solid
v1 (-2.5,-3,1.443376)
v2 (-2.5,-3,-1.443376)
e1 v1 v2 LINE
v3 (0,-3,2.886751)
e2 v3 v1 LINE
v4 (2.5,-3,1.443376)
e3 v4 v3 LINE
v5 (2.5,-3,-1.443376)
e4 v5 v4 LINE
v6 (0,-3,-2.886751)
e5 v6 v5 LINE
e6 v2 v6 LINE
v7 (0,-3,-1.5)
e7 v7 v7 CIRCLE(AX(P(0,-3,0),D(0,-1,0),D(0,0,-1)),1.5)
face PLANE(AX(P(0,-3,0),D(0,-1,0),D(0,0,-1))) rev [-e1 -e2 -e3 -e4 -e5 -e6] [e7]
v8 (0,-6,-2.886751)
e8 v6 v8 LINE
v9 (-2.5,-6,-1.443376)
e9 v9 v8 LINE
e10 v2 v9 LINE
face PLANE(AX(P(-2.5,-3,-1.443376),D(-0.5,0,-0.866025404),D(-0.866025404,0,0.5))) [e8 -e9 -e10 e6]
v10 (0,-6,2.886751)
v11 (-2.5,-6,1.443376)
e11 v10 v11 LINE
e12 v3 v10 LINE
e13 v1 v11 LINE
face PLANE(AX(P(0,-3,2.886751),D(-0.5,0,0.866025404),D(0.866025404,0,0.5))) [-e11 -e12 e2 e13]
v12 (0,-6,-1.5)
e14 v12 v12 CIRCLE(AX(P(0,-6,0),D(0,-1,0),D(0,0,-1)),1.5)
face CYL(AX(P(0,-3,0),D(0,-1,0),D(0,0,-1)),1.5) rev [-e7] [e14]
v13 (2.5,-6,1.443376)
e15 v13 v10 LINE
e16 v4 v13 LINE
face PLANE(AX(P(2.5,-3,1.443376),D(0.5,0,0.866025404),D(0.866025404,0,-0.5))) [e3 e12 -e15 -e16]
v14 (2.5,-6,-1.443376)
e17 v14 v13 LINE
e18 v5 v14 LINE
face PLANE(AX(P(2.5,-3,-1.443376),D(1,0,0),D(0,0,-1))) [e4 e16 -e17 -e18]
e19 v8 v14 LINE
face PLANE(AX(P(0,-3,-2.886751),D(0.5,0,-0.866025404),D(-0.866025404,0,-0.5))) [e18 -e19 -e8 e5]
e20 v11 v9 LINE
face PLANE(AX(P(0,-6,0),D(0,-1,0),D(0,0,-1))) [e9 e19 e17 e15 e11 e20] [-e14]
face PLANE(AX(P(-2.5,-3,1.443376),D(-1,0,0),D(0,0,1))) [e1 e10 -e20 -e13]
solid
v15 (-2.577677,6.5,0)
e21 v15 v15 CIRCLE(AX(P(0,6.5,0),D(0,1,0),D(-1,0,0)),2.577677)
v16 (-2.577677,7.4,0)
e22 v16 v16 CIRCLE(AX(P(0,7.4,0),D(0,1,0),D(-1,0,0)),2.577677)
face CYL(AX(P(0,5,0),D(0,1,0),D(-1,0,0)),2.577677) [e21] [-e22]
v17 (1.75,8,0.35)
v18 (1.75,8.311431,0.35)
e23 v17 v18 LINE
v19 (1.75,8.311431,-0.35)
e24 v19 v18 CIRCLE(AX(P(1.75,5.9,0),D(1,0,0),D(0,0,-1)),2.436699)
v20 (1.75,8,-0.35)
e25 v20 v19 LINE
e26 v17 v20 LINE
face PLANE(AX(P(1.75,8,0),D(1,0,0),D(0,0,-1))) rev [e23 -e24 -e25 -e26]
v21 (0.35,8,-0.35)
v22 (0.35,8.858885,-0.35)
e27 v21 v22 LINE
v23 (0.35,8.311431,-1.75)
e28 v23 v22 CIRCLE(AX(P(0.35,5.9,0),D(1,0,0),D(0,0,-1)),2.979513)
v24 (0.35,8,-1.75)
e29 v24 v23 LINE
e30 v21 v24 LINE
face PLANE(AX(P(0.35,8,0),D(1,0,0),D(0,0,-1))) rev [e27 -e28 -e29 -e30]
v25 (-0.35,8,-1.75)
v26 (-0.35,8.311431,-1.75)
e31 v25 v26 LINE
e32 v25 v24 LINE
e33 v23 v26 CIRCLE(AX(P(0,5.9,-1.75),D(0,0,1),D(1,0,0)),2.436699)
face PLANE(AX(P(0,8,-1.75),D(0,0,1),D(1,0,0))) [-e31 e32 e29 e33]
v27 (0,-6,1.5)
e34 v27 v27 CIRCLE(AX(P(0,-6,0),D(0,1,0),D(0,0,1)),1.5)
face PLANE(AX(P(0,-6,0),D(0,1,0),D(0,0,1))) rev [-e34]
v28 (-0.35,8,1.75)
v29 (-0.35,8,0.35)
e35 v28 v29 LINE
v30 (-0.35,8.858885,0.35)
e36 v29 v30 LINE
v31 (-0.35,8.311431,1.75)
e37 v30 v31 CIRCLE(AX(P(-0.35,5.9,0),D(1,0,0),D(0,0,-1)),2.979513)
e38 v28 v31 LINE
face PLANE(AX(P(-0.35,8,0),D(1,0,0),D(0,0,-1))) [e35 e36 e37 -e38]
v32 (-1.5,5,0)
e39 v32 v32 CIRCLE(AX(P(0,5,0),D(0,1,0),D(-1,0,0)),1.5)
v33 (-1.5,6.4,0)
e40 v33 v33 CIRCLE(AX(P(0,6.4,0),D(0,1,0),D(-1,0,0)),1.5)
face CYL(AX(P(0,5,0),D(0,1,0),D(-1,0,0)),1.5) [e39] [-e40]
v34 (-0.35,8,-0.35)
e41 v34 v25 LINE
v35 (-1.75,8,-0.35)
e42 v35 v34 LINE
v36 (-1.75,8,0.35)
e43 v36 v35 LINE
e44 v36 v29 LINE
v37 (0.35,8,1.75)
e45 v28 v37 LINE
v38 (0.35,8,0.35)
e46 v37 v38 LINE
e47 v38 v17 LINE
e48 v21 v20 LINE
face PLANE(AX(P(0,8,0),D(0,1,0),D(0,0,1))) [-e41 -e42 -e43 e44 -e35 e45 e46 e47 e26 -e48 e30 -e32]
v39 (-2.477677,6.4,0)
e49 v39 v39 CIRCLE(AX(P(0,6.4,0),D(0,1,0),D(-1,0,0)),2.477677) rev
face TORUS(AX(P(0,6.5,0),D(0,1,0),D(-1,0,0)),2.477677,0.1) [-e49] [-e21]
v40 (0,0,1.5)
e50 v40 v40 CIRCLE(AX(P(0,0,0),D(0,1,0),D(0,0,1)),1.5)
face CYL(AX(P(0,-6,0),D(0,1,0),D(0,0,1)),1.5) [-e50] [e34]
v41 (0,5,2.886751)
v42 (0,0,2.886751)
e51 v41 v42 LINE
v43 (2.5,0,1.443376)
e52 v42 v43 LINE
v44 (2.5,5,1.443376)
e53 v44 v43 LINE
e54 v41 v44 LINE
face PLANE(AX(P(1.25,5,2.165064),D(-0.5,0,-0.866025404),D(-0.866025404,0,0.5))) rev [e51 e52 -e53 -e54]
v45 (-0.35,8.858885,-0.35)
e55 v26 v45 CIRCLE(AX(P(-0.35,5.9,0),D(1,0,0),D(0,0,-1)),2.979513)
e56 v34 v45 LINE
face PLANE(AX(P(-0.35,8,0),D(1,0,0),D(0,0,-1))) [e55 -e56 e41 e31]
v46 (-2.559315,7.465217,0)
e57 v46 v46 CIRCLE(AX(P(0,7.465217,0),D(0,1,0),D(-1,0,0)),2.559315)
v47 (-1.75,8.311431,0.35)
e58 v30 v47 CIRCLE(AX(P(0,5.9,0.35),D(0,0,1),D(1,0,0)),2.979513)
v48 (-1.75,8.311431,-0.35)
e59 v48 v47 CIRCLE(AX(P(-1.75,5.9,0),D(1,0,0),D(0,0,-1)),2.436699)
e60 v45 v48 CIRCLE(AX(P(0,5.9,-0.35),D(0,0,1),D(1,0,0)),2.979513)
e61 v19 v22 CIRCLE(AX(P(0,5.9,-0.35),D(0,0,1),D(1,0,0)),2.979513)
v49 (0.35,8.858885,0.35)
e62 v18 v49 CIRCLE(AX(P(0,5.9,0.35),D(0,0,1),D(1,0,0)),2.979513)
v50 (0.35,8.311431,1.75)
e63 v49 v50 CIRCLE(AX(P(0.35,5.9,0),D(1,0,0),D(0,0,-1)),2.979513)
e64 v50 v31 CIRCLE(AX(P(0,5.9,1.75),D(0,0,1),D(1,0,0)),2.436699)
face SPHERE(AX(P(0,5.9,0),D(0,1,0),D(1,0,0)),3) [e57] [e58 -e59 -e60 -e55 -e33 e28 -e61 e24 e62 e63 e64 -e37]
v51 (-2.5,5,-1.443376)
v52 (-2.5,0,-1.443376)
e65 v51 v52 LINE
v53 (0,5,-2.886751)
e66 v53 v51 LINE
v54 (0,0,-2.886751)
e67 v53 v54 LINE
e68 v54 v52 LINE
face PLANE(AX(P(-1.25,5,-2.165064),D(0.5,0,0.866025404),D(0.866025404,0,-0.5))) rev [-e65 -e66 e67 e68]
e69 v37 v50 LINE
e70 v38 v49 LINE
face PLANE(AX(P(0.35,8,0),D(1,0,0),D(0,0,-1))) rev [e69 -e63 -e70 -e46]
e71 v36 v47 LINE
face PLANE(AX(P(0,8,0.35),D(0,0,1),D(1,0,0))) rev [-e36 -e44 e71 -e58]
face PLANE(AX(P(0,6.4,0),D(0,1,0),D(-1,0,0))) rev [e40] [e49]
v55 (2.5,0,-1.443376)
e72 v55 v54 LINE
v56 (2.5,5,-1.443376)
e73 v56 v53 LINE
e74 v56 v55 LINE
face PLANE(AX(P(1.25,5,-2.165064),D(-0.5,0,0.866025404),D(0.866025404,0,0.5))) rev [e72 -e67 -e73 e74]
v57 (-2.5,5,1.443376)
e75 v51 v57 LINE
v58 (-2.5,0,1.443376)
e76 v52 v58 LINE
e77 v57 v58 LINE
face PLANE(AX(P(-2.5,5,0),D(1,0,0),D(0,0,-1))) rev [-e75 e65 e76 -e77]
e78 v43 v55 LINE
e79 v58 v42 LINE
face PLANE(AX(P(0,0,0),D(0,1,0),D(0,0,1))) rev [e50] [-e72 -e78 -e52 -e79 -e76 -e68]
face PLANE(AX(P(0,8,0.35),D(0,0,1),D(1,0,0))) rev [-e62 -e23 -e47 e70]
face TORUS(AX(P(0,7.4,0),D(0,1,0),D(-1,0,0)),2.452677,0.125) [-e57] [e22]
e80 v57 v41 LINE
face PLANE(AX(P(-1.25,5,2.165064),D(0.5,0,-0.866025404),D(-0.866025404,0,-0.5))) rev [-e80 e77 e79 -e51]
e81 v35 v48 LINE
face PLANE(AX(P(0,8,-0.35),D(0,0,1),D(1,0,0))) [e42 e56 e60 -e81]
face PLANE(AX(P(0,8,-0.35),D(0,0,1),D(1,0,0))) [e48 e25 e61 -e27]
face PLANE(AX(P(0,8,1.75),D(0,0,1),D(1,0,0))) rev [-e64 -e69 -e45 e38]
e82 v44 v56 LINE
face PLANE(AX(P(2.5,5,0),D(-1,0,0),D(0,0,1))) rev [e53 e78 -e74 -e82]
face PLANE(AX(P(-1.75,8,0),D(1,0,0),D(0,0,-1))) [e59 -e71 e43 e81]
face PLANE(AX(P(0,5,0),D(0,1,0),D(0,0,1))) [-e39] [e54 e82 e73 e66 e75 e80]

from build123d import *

# Parameters (mm, degrees)
BOSS_EXTRUDE1_DEPTH = 5
SKETCH1_4_R         = 1.5
BOSS_EXTRUDE2_DEPTH = 6
CUT_EXTRUDE1_DEPTH  = 7
FILLET1_R           = 0.1
SKETCH5_R           = 1.5
BOSS_EXTRUDE3_DEPTH = 3


with BuildPart() as part:
    # Sketch1 → Boss-Extrude1 (new body)
    with BuildSketch(Plane(origin=(0, 0, 0), x_dir=(1, 0, 0), z_dir=(0, 1, 0))):
        Polygon((2.5, -1.443375673), (2.5, 1.443375673), (0, 2.886751346), (-2.5, 1.443375673), (-2.5, -1.443375673), (0, -2.886751346), align=None)
    extrude(amount=BOSS_EXTRUDE1_DEPTH)

    # Sketch1<4> → Boss-Extrude2 (add)
    with BuildSketch(Plane(origin=(0, 0, 0), x_dir=(1, 0, 0), z_dir=(0, 1, 0))):
        Circle(SKETCH1_4_R)
    extrude(amount=-BOSS_EXTRUDE2_DEPTH)

    # Sketch3 → Revolve1 (revolve)
    with BuildSketch(Plane.XY):
        with BuildLine():
            Line((0, 5), (1.5, 5))
            Line((1.5, 5), (1.5, 6.4))
            Line((1.5, 6.4), (2.577677109, 6.4))
            Line((2.577677109, 6.4), (2.577677109, 7.4))
            ThreePointArc((2.577677109, 7.4), (2.572999105, 7.433876498), (2.559315235, 7.465217406))
            ThreePointArc((2.559315235, 7.465217406), (1.467028933, 8.516835132), (0, 8.9))
            Line((0, 8.9), (0, 5))
        make_face()
    revolve(axis=Axis((0, 5, 0), (0, -1, 0)))

    # Sketch4 → Cut-Extrude1 (cut)
    with BuildSketch(Plane(origin=(0, 15, 0), x_dir=(1, 0, 0), z_dir=(0, 1, 0))):
        Polygon((-1.75, 0.35), (-1.75, -0.35), (-0.35, -0.35), (-0.35, -1.75), (0.35, -1.75), (0.35, -0.35), (1.75, -0.35), (1.75, 0.35), (0.35, 0.35), (0.35, 1.75), (-0.35, 1.75), (-0.35, 0.35), align=None)
    extrude(amount=-CUT_EXTRUDE1_DEPTH, mode=Mode.SUBTRACT)

    # Fillet1
    fillet1_edges = [part.edges().sort_by_distance(p)[0] for p in [
        (-2.577677109, 6.4, 0),
    ]]
    fillet(fillet1_edges, radius=FILLET1_R)


with BuildPart() as body_2:
    # Sketch5 → Boss-Extrude3 (new body)
    with BuildSketch(Plane.XZ.offset(6)):
        Polygon((2.5, 1.443375673), (0, 2.886751346), (-2.5, 1.443375673), (-2.5, -1.443375673), (0, -2.886751346), (2.5, -1.443375673), align=None)
        Circle(SKETCH5_R, mode=Mode.SUBTRACT)
    extrude(amount=-BOSS_EXTRUDE3_DEPTH)


solid = Compound([part.part, body_2.part])
